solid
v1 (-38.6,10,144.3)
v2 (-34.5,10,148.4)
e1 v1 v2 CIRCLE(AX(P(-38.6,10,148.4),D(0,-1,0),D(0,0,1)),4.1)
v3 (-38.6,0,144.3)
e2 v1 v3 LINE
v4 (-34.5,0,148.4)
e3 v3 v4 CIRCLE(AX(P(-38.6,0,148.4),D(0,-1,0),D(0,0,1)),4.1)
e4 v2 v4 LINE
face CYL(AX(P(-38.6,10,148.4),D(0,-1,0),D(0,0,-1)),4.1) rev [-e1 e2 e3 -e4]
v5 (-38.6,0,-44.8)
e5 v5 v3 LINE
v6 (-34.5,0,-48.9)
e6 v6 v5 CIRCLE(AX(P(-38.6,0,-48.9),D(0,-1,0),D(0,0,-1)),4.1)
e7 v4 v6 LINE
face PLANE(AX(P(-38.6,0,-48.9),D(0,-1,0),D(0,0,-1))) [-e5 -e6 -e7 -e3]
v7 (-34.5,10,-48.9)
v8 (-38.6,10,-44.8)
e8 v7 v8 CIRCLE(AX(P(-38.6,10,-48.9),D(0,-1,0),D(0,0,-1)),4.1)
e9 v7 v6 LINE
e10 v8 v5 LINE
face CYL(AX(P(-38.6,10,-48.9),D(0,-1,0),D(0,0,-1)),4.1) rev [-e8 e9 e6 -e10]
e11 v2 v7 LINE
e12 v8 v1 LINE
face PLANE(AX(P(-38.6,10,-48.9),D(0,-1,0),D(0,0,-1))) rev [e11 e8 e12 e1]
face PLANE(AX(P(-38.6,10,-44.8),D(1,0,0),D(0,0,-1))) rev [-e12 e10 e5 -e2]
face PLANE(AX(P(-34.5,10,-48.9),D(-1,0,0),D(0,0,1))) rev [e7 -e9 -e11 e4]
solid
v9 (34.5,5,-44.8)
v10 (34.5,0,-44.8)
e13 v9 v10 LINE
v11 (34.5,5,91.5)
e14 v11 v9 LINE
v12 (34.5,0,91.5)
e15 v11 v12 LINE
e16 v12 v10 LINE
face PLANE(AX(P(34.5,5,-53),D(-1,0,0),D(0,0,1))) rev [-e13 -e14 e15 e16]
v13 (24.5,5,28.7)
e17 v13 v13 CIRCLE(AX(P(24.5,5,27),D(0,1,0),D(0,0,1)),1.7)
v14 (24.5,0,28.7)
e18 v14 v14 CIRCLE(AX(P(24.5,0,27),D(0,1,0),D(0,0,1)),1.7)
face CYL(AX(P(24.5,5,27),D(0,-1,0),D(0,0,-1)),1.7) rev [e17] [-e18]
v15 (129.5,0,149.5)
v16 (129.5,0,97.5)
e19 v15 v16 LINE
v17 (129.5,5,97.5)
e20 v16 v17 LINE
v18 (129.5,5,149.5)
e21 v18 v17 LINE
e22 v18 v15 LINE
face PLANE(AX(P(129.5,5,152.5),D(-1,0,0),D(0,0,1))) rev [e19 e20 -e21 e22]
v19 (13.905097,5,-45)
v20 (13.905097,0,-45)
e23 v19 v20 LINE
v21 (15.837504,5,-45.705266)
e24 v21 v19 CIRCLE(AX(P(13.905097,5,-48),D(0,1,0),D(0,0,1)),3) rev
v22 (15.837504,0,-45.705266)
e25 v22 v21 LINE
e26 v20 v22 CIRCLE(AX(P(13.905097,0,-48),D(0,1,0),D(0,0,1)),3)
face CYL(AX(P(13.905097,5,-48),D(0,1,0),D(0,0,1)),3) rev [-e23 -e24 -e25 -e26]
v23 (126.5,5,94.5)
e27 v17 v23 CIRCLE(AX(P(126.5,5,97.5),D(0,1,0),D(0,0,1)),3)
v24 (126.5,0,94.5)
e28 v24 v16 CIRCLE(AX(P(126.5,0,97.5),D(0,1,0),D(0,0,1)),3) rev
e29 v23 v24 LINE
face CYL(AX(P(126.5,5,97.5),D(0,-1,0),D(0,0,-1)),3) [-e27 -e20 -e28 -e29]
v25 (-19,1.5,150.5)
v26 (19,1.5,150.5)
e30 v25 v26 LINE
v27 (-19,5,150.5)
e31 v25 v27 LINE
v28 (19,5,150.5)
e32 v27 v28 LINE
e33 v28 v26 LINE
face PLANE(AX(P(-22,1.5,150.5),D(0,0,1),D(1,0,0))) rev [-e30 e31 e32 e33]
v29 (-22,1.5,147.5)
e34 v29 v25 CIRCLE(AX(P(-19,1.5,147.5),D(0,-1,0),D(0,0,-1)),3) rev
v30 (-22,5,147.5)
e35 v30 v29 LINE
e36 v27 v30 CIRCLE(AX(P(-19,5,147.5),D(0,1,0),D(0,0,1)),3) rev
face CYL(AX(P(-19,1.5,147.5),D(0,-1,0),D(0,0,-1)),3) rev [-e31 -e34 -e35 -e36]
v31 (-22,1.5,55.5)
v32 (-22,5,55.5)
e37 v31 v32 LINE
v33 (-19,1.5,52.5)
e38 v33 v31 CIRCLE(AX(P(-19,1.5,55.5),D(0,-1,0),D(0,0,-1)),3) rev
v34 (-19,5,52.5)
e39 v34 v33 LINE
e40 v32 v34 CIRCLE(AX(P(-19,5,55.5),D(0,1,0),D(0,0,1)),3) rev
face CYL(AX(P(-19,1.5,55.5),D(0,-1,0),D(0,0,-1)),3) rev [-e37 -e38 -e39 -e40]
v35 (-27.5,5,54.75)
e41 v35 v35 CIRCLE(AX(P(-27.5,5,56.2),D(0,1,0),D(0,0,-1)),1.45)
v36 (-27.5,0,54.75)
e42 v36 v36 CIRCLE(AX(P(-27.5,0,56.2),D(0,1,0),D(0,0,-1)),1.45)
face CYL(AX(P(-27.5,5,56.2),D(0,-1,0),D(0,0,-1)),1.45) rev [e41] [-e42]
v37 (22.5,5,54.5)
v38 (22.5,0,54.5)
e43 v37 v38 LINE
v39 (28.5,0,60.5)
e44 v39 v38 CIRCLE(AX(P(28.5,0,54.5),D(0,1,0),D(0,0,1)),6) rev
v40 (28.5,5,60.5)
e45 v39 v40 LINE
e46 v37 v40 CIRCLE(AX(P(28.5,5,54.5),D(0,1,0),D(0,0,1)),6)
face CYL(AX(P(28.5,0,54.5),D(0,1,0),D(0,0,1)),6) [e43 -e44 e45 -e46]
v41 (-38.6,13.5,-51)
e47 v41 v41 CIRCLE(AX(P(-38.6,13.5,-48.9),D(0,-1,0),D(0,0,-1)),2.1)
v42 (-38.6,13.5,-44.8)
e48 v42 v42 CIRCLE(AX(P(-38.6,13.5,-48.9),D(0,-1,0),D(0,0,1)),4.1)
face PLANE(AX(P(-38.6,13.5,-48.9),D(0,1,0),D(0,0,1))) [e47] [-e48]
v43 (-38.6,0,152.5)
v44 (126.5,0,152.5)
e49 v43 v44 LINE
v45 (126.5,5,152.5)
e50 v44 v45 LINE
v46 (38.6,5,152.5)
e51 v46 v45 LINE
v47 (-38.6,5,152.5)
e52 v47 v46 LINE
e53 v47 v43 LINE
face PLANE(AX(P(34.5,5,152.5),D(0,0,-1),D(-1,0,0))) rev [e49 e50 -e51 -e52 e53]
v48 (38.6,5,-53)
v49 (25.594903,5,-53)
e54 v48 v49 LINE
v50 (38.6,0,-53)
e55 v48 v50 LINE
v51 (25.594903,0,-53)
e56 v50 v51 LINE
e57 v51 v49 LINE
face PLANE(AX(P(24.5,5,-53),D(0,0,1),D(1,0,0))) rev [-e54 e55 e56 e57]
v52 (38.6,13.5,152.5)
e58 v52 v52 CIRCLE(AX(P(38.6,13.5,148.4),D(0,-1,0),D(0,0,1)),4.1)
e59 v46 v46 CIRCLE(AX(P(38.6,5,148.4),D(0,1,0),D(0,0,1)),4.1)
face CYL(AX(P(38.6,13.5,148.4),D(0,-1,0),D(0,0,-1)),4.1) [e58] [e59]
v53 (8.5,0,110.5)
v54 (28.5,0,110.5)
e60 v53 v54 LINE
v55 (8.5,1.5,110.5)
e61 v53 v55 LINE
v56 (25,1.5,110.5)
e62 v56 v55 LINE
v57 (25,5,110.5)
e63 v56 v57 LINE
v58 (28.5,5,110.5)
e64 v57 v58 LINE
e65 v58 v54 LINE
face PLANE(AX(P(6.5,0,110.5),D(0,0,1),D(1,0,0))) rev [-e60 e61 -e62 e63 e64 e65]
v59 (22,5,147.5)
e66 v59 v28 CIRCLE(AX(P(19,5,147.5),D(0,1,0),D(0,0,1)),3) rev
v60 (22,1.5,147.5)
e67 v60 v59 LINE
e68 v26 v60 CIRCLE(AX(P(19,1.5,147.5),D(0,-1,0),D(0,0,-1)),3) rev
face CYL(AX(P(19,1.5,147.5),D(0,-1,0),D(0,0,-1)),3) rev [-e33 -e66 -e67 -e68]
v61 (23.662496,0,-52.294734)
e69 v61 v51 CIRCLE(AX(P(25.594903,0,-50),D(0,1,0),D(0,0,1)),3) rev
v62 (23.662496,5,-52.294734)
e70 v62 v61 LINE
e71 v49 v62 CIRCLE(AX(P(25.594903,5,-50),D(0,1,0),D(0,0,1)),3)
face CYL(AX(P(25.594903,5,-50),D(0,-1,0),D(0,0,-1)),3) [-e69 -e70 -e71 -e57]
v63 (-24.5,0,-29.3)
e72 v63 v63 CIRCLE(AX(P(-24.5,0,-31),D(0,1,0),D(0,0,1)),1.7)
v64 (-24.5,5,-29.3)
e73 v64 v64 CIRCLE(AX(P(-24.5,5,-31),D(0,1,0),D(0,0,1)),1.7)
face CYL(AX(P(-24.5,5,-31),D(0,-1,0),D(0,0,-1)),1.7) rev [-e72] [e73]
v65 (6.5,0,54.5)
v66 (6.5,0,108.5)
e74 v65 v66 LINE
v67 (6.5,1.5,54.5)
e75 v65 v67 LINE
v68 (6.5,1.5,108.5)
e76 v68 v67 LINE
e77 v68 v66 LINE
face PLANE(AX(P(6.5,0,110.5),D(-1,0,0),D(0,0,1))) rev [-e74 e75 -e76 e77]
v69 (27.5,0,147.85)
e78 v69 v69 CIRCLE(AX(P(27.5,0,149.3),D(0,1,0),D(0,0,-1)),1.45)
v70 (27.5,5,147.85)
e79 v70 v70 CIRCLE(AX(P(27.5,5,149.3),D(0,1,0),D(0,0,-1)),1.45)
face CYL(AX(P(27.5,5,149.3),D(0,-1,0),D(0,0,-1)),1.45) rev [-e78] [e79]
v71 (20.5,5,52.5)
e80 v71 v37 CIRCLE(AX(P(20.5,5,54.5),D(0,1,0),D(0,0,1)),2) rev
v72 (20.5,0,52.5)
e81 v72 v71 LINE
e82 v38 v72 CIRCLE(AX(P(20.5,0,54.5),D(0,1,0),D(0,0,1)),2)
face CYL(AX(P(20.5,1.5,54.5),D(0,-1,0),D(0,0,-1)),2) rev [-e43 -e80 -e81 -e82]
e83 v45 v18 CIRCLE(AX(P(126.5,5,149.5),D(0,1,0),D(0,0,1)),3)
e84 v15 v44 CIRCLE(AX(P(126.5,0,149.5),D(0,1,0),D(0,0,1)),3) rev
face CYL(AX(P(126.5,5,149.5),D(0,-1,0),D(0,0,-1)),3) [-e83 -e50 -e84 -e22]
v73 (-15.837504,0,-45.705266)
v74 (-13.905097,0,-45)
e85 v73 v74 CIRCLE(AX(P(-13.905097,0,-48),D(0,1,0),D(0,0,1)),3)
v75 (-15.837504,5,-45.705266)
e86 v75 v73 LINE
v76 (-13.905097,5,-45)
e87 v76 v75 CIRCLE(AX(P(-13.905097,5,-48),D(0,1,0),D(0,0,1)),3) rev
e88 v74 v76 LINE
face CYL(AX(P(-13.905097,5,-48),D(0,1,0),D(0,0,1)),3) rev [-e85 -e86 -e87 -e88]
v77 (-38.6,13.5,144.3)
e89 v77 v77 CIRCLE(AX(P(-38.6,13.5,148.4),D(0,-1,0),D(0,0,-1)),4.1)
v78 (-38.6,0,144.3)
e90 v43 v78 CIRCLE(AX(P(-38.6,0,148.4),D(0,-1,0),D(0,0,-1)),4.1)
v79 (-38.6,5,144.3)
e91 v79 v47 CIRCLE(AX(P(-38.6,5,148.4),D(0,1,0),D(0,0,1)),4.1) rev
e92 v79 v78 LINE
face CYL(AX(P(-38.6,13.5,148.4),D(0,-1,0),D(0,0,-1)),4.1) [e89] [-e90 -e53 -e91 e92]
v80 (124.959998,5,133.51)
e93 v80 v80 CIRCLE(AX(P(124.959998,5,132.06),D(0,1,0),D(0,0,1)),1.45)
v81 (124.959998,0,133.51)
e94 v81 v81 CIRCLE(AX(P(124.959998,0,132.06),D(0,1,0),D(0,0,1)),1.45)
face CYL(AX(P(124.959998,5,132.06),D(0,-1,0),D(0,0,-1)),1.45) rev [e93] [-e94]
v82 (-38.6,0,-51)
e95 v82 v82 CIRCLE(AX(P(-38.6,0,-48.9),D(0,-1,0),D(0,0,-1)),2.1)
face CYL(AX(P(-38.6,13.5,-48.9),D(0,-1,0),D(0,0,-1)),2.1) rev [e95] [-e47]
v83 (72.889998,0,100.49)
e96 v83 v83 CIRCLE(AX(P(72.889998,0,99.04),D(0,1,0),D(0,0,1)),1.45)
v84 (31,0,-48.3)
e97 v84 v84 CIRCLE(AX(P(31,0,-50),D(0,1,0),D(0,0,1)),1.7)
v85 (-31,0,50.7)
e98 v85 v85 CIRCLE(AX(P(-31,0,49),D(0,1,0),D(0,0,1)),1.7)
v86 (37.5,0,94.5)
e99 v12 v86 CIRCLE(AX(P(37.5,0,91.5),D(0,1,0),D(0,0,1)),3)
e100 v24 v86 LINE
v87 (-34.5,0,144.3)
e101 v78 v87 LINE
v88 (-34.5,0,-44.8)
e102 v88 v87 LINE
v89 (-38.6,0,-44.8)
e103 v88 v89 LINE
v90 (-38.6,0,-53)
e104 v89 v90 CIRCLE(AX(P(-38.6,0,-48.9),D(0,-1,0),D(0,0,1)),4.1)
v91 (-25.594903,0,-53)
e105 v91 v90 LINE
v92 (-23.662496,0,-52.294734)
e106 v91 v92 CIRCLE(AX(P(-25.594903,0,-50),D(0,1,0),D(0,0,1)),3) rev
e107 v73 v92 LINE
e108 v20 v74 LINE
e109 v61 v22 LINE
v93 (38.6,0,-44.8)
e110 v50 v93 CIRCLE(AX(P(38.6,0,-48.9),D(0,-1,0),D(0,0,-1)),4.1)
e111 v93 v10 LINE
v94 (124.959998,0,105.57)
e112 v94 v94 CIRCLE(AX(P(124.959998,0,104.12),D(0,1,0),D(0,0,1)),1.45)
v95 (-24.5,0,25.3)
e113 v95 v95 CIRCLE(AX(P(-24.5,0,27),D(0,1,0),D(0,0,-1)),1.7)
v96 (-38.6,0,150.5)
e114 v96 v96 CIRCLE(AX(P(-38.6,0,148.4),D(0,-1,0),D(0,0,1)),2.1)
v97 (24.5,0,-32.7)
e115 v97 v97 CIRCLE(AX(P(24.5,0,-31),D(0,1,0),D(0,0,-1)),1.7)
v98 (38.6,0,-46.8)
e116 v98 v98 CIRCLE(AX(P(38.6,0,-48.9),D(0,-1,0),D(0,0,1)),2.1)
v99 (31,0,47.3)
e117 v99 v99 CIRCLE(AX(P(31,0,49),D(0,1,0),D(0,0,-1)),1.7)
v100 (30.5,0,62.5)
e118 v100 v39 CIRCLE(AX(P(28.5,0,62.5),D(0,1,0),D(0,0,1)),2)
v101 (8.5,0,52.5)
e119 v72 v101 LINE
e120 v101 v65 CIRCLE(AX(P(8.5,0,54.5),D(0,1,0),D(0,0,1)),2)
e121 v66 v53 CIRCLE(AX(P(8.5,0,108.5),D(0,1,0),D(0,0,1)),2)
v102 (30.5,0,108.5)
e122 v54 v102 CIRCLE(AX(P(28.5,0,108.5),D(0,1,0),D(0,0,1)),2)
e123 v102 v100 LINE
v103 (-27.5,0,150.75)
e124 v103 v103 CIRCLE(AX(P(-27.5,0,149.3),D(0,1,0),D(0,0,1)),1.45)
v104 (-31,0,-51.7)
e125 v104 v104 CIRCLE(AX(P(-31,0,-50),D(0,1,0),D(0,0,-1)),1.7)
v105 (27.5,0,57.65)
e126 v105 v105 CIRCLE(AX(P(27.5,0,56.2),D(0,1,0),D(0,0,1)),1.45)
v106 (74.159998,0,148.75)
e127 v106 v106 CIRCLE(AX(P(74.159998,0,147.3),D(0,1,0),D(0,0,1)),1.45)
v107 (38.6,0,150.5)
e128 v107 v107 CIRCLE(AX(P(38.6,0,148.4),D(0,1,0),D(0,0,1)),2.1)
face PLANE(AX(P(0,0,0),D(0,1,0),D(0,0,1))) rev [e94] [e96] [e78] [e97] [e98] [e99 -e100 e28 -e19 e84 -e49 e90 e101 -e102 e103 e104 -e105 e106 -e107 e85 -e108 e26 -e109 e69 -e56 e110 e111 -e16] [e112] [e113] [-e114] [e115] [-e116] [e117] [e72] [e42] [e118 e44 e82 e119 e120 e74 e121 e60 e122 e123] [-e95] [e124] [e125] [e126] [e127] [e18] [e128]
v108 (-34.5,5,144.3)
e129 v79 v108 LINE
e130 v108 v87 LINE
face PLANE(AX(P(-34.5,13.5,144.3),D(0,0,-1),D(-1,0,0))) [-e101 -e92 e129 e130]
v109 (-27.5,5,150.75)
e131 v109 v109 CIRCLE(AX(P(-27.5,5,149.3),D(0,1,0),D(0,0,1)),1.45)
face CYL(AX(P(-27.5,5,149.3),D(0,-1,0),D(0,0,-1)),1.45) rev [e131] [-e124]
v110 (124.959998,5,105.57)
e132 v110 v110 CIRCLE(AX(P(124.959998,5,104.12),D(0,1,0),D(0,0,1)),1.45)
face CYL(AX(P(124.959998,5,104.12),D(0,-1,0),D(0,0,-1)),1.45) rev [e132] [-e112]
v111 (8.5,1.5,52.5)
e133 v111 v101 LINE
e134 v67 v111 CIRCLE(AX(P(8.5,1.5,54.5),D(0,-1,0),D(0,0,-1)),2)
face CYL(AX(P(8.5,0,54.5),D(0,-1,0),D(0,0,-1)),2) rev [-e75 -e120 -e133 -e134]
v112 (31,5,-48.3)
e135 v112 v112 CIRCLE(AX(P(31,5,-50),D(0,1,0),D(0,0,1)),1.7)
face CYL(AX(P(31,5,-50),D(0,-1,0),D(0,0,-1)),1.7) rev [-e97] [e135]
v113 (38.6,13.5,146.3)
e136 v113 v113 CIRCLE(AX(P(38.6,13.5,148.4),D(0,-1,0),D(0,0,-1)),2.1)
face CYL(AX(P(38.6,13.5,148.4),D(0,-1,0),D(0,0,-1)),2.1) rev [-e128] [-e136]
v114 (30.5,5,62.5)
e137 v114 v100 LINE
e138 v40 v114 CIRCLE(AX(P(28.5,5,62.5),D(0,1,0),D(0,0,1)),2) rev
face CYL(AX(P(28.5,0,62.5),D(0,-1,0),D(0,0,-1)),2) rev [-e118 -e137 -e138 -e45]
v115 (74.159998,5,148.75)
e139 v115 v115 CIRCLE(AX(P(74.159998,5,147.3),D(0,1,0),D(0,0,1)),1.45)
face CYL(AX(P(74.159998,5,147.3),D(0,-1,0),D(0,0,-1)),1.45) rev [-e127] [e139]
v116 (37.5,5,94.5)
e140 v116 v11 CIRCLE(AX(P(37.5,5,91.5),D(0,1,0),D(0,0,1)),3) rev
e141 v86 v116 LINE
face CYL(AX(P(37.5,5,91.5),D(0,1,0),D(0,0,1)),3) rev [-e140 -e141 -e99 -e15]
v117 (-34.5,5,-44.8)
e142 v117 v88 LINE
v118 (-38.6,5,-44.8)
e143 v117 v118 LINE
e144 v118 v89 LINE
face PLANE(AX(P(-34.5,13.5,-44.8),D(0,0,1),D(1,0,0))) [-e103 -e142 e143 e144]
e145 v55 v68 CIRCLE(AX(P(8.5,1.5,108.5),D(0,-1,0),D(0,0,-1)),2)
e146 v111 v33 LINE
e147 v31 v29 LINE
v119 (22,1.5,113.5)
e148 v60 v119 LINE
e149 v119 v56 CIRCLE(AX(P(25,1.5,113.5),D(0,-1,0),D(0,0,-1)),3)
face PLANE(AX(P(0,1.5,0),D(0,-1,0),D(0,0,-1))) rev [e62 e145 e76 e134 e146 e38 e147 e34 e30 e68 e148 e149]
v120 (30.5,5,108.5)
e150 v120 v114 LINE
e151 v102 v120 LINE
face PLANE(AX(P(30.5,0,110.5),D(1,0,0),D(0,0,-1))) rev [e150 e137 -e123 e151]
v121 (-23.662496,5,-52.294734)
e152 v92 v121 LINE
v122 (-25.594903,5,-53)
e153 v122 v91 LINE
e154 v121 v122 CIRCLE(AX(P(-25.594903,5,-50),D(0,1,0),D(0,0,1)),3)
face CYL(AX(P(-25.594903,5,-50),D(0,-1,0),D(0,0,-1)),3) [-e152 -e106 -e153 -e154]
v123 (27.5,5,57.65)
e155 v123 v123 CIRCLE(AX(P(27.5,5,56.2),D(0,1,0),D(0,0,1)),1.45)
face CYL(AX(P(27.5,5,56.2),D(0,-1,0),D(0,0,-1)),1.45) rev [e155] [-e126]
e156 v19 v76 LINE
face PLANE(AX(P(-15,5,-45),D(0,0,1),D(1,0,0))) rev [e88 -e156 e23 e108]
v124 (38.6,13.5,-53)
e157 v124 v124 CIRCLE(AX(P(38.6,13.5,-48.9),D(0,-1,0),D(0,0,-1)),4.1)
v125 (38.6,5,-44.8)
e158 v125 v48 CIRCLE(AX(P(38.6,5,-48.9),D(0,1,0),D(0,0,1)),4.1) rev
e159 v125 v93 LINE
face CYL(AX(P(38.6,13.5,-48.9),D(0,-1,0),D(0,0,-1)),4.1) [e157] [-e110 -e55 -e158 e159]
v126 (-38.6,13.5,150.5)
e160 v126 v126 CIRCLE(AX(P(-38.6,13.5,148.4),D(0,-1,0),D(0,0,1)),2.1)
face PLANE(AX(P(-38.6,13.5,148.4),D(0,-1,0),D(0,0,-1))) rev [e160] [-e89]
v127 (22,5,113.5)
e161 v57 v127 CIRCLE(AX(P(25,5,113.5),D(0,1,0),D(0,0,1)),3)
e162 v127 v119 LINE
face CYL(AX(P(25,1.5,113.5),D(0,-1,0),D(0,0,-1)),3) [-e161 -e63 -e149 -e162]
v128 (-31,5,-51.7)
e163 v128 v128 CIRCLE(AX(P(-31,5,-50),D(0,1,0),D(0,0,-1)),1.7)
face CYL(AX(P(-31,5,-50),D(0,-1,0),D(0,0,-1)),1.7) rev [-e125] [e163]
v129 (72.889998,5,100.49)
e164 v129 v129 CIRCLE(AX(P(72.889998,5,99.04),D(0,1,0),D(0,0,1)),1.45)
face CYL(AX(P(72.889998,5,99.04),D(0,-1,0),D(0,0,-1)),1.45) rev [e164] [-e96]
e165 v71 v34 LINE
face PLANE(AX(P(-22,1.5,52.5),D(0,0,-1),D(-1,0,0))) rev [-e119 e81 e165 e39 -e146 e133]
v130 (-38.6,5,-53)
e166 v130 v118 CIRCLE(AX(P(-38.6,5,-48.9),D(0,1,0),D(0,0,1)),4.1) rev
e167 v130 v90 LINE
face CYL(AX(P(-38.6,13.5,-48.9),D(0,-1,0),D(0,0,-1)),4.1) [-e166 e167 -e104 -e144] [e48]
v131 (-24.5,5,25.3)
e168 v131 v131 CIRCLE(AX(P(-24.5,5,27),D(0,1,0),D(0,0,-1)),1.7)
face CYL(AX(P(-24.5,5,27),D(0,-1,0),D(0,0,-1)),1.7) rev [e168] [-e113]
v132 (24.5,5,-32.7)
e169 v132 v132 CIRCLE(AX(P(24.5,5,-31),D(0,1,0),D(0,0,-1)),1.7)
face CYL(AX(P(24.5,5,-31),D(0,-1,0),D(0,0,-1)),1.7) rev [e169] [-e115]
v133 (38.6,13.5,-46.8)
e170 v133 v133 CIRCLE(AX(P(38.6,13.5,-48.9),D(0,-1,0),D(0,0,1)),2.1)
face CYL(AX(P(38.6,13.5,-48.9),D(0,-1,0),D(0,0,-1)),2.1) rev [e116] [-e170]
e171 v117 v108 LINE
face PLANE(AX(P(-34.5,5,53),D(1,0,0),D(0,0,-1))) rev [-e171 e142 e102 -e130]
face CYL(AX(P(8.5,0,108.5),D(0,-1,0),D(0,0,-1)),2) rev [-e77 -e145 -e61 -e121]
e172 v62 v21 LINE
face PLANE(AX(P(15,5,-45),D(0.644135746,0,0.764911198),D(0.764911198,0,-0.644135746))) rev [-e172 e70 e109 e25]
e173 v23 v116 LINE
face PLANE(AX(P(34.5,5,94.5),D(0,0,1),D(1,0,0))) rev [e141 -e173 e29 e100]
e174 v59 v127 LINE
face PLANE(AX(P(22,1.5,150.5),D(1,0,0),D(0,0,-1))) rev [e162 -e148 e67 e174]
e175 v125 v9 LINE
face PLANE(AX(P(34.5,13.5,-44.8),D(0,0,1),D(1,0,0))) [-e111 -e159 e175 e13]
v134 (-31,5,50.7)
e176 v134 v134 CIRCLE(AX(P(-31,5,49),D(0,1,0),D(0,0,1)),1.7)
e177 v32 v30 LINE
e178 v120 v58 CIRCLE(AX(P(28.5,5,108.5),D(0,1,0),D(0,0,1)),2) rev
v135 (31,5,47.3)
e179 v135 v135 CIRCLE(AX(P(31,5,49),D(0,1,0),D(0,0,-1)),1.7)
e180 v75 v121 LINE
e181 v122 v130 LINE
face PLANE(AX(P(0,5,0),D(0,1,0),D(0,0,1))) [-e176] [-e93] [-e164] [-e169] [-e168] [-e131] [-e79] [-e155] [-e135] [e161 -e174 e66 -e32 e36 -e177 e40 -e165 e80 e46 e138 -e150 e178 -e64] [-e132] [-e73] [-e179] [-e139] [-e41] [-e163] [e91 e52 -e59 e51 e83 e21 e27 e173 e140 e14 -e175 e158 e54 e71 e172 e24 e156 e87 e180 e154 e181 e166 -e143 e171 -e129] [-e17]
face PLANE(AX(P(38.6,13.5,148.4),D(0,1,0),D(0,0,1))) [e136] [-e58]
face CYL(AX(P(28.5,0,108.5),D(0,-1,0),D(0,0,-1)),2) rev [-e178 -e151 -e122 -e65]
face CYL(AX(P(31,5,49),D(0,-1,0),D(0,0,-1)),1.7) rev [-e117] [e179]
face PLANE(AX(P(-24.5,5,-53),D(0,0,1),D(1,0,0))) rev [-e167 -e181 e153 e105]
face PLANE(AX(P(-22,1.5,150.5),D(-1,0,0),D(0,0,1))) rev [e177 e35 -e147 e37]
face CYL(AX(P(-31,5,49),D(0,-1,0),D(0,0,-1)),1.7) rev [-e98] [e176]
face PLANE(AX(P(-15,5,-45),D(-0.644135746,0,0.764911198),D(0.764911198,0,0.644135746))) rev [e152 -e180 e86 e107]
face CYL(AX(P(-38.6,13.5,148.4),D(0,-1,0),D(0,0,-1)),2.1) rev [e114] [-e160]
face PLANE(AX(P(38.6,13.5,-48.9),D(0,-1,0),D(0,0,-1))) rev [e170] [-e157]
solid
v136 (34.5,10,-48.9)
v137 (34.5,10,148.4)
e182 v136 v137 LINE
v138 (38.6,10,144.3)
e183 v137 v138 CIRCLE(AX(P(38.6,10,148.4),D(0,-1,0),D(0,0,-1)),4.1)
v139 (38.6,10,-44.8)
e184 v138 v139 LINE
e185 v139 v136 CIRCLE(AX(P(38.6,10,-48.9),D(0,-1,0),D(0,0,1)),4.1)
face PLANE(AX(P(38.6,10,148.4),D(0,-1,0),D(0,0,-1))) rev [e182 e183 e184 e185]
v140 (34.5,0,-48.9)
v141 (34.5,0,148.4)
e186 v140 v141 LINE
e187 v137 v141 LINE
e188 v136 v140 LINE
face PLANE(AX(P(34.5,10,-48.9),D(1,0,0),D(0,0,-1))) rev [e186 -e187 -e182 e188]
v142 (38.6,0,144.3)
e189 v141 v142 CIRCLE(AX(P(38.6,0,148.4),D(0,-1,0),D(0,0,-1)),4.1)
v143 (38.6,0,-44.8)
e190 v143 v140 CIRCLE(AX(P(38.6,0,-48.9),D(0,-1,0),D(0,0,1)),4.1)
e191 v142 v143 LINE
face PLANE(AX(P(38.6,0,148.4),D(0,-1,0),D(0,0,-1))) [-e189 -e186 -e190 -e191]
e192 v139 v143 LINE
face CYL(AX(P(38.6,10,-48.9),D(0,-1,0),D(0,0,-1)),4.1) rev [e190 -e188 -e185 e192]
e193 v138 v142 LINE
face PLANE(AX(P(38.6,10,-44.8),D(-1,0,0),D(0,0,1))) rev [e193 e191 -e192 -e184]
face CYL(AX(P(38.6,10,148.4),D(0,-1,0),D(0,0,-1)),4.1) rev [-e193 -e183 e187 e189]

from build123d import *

# Parameters (mm, degrees)
ESQUISSE1_R                                = 1.7
ESQUISSE1_R_2                              = 1.45
BOSS_EXTRU_1_DEPTH                         = 5
ESQUISSE2_W                                = 44
ESQUISSE2_H                                = 98
ENL_V_MAT_PCB_ECRAN_INO_DEPTH              = 3.5
ENL_V_MAT_PCB_EXCROISSANCE_ECRAN_INO_DEPTH = 201.128708585
CONG_EXCROISSANCE_PCB_ECRAN_INO_R          = 2
ESQUISSE10_R                               = 2.1
BOSS_EXTRU_3_DEPTH                         = 13.5
ENL_V_START                                = -8.5
ESQUISSE13_R                               = 5.798275606
ESQUISSE13_R_2                             = 4.1
ENL_V_MAT_EXTRU_4_DEPTH                    = 8.5
ESQUISSE14_R                               = 2.1
ENL_V_MAT_EXTRU_5_DEPTH                    = 201.24672282
CONG_1_R                                   = 6
BOSS_EXTRU_10_DEPTH                        = 10
BOSS_EXTRU_10_2_DEPTH                      = 10
CONG_GLOBAL_R                              = 3


with BuildPart() as part:
    # Esquisse1 → Boss.-Extru.1 (new body)
    with BuildSketch(Plane(origin=(0, 0, 0), x_dir=(1, 0, 0), z_dir=(0, 1, 0))):
        Polygon((-15, 45), (15, 45), (24.5, 53), (34.5, 53), (34.5, -53), (34.5, -94.5), (129.5, -94.5), (129.5, -152.5), (34.5, -152.5), (-34.5, -152.5), (-34.5, -53), (-34.5, 53), (-24.5, 53), align=None)
        with Locations(Location((31, 50, 0), (0, 0, 270))):
            Circle(ESQUISSE1_R, mode=Mode.SUBTRACT)
        with Locations(Location((31, -49, 0), (0, 0, 90))):
            Circle(ESQUISSE1_R, mode=Mode.SUBTRACT)
        with Locations(Location((27.5, -56.2, 0), (0, 0, 270))):
            Circle(ESQUISSE1_R_2, mode=Mode.SUBTRACT)
        with Locations(Location((27.5, -149.3, 0), (0, 0, 90))):
            Circle(ESQUISSE1_R_2, mode=Mode.SUBTRACT)
        with Locations(Location((-27.5, -149.3, 0), (0, 0, 270))):
            Circle(ESQUISSE1_R_2, mode=Mode.SUBTRACT)
        with Locations(Location((-27.5, -56.2, 0), (0, 0, 90))):
            Circle(ESQUISSE1_R_2, mode=Mode.SUBTRACT)
        with Locations(Location((-31, -49, 0), (0, 0, 270))):
            Circle(ESQUISSE1_R, mode=Mode.SUBTRACT)
        with Locations(Location((-31, 50, 0), (0, 0, 90))):
            Circle(ESQUISSE1_R, mode=Mode.SUBTRACT)
        with Locations(Location((-24.5, 31, 0), (0, 0, 270))):
            Circle(ESQUISSE1_R, mode=Mode.SUBTRACT)
        with Locations(Location((24.5, 31, 0), (0, 0, 90))):
            Circle(ESQUISSE1_R, mode=Mode.SUBTRACT)
        with Locations(Location((72.889998169, -99.04, 0), (0, 0, 270))):
            Circle(ESQUISSE1_R_2, mode=Mode.SUBTRACT)
        with Locations(Location((24.5, -27, 0), (0, 0, 270))):
            Circle(ESQUISSE1_R, mode=Mode.SUBTRACT)
        with Locations(Location((-24.5, -27, 0), (0, 0, 90))):
            Circle(ESQUISSE1_R, mode=Mode.SUBTRACT)
        with Locations(Location((124.959998169, -104.12, 0), (0, 0, 270))):
            Circle(ESQUISSE1_R_2, mode=Mode.SUBTRACT)
        with Locations(Location((124.959998169, -132.06, 0), (0, 0, 270))):
            Circle(ESQUISSE1_R_2, mode=Mode.SUBTRACT)
        with Locations(Location((74.159998169, -147.3, 0), (0, 0, 270))):
            Circle(ESQUISSE1_R_2, mode=Mode.SUBTRACT)
    extrude(amount=BOSS_EXTRU_1_DEPTH)

    # Esquisse2 → Enlèv. mat.-pcb ecran ino (cut)
    with BuildSketch(Plane(origin=(0, 5, 0), x_dir=(1, 0, 0), z_dir=(0, 1, 0))):
        with Locations((0, -101.5)):
            Rectangle(ESQUISSE2_W, ESQUISSE2_H)
    extrude(amount=-ENL_V_MAT_PCB_ECRAN_INO_DEPTH, mode=Mode.SUBTRACT)

    # Esquisse3 → Enlèv. mat.- pcb excroissance ecran ino (cut, through all)
    with BuildSketch(Plane(origin=(0, 5, 0), x_dir=(1, 0, 0), z_dir=(0, 1, 0))):
        Polygon((30.5, -110.5), (30.5, -60.5), (22.5, -60.5), (22.5, -52.5), (6.5, -52.5), (6.5, -110.5), align=None)
    extrude(amount=-ENL_V_MAT_PCB_EXCROISSANCE_ECRAN_INO_DEPTH, mode=Mode.SUBTRACT)

    # Congé excroissance pcb ecran ino
    cong_excroissance_pcb_ecran_ino_edges = [part.edges().sort_by_distance(p)[0] for p in [
        (6.5, 0.75, 110.5),
        (6.5, 0.75, 52.5),
        (30.5, 2.5, 110.5),
        (22.5, 2.5, 52.5),
        (30.5, 2.5, 60.5),
    ]]
    fillet(cong_excroissance_pcb_ecran_ino_edges, radius=CONG_EXCROISSANCE_PCB_ECRAN_INO_R)

    # Esquisse10 → Boss.-Extru.3 (add)
    # profile 1 of 4: a face of its own
    with BuildSketch(Plane.XZ):
        with BuildLine():
            Line((-34.5, -53), (-38.6, -53))
            ThreePointArc((-38.6, -53), (-42.7, -48.9), (-38.6, -44.8))
            Line((-38.6, -44.8), (-34.5, -44.8))
            Line((-34.5, -44.8), (-34.5, -53))
        make_face()
        with Locations(Location((-38.6, -48.9, 0), (0, 0, 270))):
            Circle(ESQUISSE10_R, mode=Mode.SUBTRACT)
    # profile 2 of 4: a face of its own
    with BuildSketch(Plane.XZ):
        with BuildLine():
            Line((34.5, -44.8), (38.6, -44.8))
            ThreePointArc((38.6, -44.8), (42.7, -48.9), (38.6, -53))
            Line((38.6, -53), (34.5, -53))
            Line((34.5, -53), (34.5, -44.8))
        make_face()
        with Locations(Location((38.6, -48.9, 0), (0, 0, 90))):
            Circle(ESQUISSE10_R, mode=Mode.SUBTRACT)
    # profile 3 of 4: a face of its own
    with BuildSketch(Plane.XZ):
        with BuildLine():
            Line((34.5, 152.5), (38.6, 152.5))
            ThreePointArc((38.6, 152.5), (42.7, 148.4), (38.6, 144.3))
            Line((38.6, 144.3), (34.5, 144.3))
            Line((34.5, 144.3), (34.5, 152.5))
        make_face()
        with Locations(Location((38.6, 148.4, 0), (0, 0, 270))):
            Circle(ESQUISSE10_R, mode=Mode.SUBTRACT)
    # profile 4 of 4: a face of its own
    with BuildSketch(Plane.XZ):
        with BuildLine():
            Line((-34.5, 144.3), (-38.6, 144.3))
            ThreePointArc((-38.6, 144.3), (-42.7, 148.4), (-38.6, 152.5))
            Line((-38.6, 152.5), (-34.5, 152.5))
            Line((-34.5, 152.5), (-34.5, 144.3))
        make_face()
        with Locations(Location((-38.6, 148.4, 0), (0, 0, 90))):
            Circle(ESQUISSE10_R, mode=Mode.SUBTRACT)
    extrude(amount=-BOSS_EXTRU_3_DEPTH)

    # Esquisse13 → Enlèv. mat.-Extru.4 (cut)
    # profile 1 of 4: a face of its own
    with BuildSketch(Plane(origin=(0, 13.5, 0), x_dir=(1, 0, 0), z_dir=(0, 1, 0)).offset(ENL_V_START)):
        with Locations((-38.6, -148.4)):
            Circle(ESQUISSE13_R)
        with Locations(Location((-38.6, -148.4, 0), (0, 0, 90))):
            Circle(ESQUISSE13_R_2, mode=Mode.SUBTRACT)
    # profile 2 of 4: a face of its own
    with BuildSketch(Plane(origin=(0, 13.5, 0), x_dir=(1, 0, 0), z_dir=(0, 1, 0)).offset(ENL_V_START)):
        with Locations((38.6, -148.4)):
            Circle(ESQUISSE13_R)
        with Locations(Location((38.6, -148.4, 0), (0, 0, 270))):
            Circle(ESQUISSE13_R_2, mode=Mode.SUBTRACT)
    # profile 3 of 4: a face of its own
    with BuildSketch(Plane(origin=(0, 13.5, 0), x_dir=(1, 0, 0), z_dir=(0, 1, 0)).offset(ENL_V_START)):
        with Locations((38.6, 48.9)):
            Circle(ESQUISSE13_R)
        with Locations(Location((38.6, 48.9, 0), (0, 0, 90))):
            Circle(ESQUISSE13_R_2, mode=Mode.SUBTRACT)
    # profile 4 of 4: a face of its own
    with BuildSketch(Plane(origin=(0, 13.5, 0), x_dir=(1, 0, 0), z_dir=(0, 1, 0)).offset(ENL_V_START)):
        with Locations((-38.6, 48.9)):
            Circle(ESQUISSE13_R)
        with Locations(Location((-38.6, 48.9, 0), (0, 0, 270))):
            Circle(ESQUISSE13_R_2, mode=Mode.SUBTRACT)
    extrude(amount=ENL_V_MAT_EXTRU_4_DEPTH, mode=Mode.SUBTRACT)

    # Esquisse14 → Enlèv. mat.-Extru.5 (cut, through all)
    with BuildSketch(Plane(origin=(0, 5, 0), x_dir=(1, 0, 0), z_dir=(0, 1, 0))):
        with Locations(Location((38.6, -148.4, 0), (0, 0, 90))):
            Circle(ESQUISSE14_R)
    extrude(amount=-ENL_V_MAT_EXTRU_5_DEPTH, mode=Mode.SUBTRACT)

    # Congé1
    cong_1_edges = [part.edges().sort_by_distance(p)[0] for p in [
        (22.5, 2.5, 60.5),
    ]]
    fillet(cong_1_edges, radius=CONG_1_R - 0.0001)  # a hair under: the kernel refuses the full size

    # Congé global
    cong_global_edges = [part.edges().sort_by_distance(p)[0] for p in [
        (-22, 3.25, 150.5),
        (-22, 3.25, 52.5),
        (22, 3.25, 150.5),
        (22, 3.25, 110.5),
        (24.5, 2.5, -53),
        (34.5, 2.5, 94.5),
        (129.5, 2.5, 94.5),
        (129.5, 2.5, 152.5),
        (-24.5, 2.5, -53),
        (-15, 2.5, -45),
        (15, 2.5, -45),
    ]]
    fillet(cong_global_edges, radius=CONG_GLOBAL_R)


with BuildPart() as body_2:
    # Esquisse19 → Boss.-Extru.10 (new body)
    with BuildSketch(Plane(origin=(0, 0, 0), x_dir=(1, 0, 0), z_dir=(0, 1, 0))):
        with BuildLine():
            Line((-34.5, 48.9), (-34.5, -148.4))
            ThreePointArc((-34.5, -148.4), (-35.700862197, -145.500862197), (-38.6, -144.3))
            Line((-38.6, -144.3), (-38.6, 44.8))
            ThreePointArc((-38.6, 44.8), (-35.700862197, 46.000862197), (-34.5, 48.9))
        make_face()
    extrude(amount=BOSS_EXTRU_10_DEPTH)


with BuildPart() as body_3:
    # Esquisse19 → Boss.-Extru.10 2 (new body)
    with BuildSketch(Plane(origin=(0, 0, 0), x_dir=(1, 0, 0), z_dir=(0, 1, 0))):
        with BuildLine():
            Line((38.6, 44.8), (38.6, -144.3))
            ThreePointArc((38.6, -144.3), (35.700862197, -145.500862197), (34.5, -148.4))
            Line((34.5, -148.4), (34.5, 48.9))
            ThreePointArc((34.5, 48.9), (35.700862197, 46.000862197), (38.6, 44.8))
        make_face()
    extrude(amount=BOSS_EXTRU_10_2_DEPTH)


solid = Compound([part.part, body_2.part, body_3.part])
